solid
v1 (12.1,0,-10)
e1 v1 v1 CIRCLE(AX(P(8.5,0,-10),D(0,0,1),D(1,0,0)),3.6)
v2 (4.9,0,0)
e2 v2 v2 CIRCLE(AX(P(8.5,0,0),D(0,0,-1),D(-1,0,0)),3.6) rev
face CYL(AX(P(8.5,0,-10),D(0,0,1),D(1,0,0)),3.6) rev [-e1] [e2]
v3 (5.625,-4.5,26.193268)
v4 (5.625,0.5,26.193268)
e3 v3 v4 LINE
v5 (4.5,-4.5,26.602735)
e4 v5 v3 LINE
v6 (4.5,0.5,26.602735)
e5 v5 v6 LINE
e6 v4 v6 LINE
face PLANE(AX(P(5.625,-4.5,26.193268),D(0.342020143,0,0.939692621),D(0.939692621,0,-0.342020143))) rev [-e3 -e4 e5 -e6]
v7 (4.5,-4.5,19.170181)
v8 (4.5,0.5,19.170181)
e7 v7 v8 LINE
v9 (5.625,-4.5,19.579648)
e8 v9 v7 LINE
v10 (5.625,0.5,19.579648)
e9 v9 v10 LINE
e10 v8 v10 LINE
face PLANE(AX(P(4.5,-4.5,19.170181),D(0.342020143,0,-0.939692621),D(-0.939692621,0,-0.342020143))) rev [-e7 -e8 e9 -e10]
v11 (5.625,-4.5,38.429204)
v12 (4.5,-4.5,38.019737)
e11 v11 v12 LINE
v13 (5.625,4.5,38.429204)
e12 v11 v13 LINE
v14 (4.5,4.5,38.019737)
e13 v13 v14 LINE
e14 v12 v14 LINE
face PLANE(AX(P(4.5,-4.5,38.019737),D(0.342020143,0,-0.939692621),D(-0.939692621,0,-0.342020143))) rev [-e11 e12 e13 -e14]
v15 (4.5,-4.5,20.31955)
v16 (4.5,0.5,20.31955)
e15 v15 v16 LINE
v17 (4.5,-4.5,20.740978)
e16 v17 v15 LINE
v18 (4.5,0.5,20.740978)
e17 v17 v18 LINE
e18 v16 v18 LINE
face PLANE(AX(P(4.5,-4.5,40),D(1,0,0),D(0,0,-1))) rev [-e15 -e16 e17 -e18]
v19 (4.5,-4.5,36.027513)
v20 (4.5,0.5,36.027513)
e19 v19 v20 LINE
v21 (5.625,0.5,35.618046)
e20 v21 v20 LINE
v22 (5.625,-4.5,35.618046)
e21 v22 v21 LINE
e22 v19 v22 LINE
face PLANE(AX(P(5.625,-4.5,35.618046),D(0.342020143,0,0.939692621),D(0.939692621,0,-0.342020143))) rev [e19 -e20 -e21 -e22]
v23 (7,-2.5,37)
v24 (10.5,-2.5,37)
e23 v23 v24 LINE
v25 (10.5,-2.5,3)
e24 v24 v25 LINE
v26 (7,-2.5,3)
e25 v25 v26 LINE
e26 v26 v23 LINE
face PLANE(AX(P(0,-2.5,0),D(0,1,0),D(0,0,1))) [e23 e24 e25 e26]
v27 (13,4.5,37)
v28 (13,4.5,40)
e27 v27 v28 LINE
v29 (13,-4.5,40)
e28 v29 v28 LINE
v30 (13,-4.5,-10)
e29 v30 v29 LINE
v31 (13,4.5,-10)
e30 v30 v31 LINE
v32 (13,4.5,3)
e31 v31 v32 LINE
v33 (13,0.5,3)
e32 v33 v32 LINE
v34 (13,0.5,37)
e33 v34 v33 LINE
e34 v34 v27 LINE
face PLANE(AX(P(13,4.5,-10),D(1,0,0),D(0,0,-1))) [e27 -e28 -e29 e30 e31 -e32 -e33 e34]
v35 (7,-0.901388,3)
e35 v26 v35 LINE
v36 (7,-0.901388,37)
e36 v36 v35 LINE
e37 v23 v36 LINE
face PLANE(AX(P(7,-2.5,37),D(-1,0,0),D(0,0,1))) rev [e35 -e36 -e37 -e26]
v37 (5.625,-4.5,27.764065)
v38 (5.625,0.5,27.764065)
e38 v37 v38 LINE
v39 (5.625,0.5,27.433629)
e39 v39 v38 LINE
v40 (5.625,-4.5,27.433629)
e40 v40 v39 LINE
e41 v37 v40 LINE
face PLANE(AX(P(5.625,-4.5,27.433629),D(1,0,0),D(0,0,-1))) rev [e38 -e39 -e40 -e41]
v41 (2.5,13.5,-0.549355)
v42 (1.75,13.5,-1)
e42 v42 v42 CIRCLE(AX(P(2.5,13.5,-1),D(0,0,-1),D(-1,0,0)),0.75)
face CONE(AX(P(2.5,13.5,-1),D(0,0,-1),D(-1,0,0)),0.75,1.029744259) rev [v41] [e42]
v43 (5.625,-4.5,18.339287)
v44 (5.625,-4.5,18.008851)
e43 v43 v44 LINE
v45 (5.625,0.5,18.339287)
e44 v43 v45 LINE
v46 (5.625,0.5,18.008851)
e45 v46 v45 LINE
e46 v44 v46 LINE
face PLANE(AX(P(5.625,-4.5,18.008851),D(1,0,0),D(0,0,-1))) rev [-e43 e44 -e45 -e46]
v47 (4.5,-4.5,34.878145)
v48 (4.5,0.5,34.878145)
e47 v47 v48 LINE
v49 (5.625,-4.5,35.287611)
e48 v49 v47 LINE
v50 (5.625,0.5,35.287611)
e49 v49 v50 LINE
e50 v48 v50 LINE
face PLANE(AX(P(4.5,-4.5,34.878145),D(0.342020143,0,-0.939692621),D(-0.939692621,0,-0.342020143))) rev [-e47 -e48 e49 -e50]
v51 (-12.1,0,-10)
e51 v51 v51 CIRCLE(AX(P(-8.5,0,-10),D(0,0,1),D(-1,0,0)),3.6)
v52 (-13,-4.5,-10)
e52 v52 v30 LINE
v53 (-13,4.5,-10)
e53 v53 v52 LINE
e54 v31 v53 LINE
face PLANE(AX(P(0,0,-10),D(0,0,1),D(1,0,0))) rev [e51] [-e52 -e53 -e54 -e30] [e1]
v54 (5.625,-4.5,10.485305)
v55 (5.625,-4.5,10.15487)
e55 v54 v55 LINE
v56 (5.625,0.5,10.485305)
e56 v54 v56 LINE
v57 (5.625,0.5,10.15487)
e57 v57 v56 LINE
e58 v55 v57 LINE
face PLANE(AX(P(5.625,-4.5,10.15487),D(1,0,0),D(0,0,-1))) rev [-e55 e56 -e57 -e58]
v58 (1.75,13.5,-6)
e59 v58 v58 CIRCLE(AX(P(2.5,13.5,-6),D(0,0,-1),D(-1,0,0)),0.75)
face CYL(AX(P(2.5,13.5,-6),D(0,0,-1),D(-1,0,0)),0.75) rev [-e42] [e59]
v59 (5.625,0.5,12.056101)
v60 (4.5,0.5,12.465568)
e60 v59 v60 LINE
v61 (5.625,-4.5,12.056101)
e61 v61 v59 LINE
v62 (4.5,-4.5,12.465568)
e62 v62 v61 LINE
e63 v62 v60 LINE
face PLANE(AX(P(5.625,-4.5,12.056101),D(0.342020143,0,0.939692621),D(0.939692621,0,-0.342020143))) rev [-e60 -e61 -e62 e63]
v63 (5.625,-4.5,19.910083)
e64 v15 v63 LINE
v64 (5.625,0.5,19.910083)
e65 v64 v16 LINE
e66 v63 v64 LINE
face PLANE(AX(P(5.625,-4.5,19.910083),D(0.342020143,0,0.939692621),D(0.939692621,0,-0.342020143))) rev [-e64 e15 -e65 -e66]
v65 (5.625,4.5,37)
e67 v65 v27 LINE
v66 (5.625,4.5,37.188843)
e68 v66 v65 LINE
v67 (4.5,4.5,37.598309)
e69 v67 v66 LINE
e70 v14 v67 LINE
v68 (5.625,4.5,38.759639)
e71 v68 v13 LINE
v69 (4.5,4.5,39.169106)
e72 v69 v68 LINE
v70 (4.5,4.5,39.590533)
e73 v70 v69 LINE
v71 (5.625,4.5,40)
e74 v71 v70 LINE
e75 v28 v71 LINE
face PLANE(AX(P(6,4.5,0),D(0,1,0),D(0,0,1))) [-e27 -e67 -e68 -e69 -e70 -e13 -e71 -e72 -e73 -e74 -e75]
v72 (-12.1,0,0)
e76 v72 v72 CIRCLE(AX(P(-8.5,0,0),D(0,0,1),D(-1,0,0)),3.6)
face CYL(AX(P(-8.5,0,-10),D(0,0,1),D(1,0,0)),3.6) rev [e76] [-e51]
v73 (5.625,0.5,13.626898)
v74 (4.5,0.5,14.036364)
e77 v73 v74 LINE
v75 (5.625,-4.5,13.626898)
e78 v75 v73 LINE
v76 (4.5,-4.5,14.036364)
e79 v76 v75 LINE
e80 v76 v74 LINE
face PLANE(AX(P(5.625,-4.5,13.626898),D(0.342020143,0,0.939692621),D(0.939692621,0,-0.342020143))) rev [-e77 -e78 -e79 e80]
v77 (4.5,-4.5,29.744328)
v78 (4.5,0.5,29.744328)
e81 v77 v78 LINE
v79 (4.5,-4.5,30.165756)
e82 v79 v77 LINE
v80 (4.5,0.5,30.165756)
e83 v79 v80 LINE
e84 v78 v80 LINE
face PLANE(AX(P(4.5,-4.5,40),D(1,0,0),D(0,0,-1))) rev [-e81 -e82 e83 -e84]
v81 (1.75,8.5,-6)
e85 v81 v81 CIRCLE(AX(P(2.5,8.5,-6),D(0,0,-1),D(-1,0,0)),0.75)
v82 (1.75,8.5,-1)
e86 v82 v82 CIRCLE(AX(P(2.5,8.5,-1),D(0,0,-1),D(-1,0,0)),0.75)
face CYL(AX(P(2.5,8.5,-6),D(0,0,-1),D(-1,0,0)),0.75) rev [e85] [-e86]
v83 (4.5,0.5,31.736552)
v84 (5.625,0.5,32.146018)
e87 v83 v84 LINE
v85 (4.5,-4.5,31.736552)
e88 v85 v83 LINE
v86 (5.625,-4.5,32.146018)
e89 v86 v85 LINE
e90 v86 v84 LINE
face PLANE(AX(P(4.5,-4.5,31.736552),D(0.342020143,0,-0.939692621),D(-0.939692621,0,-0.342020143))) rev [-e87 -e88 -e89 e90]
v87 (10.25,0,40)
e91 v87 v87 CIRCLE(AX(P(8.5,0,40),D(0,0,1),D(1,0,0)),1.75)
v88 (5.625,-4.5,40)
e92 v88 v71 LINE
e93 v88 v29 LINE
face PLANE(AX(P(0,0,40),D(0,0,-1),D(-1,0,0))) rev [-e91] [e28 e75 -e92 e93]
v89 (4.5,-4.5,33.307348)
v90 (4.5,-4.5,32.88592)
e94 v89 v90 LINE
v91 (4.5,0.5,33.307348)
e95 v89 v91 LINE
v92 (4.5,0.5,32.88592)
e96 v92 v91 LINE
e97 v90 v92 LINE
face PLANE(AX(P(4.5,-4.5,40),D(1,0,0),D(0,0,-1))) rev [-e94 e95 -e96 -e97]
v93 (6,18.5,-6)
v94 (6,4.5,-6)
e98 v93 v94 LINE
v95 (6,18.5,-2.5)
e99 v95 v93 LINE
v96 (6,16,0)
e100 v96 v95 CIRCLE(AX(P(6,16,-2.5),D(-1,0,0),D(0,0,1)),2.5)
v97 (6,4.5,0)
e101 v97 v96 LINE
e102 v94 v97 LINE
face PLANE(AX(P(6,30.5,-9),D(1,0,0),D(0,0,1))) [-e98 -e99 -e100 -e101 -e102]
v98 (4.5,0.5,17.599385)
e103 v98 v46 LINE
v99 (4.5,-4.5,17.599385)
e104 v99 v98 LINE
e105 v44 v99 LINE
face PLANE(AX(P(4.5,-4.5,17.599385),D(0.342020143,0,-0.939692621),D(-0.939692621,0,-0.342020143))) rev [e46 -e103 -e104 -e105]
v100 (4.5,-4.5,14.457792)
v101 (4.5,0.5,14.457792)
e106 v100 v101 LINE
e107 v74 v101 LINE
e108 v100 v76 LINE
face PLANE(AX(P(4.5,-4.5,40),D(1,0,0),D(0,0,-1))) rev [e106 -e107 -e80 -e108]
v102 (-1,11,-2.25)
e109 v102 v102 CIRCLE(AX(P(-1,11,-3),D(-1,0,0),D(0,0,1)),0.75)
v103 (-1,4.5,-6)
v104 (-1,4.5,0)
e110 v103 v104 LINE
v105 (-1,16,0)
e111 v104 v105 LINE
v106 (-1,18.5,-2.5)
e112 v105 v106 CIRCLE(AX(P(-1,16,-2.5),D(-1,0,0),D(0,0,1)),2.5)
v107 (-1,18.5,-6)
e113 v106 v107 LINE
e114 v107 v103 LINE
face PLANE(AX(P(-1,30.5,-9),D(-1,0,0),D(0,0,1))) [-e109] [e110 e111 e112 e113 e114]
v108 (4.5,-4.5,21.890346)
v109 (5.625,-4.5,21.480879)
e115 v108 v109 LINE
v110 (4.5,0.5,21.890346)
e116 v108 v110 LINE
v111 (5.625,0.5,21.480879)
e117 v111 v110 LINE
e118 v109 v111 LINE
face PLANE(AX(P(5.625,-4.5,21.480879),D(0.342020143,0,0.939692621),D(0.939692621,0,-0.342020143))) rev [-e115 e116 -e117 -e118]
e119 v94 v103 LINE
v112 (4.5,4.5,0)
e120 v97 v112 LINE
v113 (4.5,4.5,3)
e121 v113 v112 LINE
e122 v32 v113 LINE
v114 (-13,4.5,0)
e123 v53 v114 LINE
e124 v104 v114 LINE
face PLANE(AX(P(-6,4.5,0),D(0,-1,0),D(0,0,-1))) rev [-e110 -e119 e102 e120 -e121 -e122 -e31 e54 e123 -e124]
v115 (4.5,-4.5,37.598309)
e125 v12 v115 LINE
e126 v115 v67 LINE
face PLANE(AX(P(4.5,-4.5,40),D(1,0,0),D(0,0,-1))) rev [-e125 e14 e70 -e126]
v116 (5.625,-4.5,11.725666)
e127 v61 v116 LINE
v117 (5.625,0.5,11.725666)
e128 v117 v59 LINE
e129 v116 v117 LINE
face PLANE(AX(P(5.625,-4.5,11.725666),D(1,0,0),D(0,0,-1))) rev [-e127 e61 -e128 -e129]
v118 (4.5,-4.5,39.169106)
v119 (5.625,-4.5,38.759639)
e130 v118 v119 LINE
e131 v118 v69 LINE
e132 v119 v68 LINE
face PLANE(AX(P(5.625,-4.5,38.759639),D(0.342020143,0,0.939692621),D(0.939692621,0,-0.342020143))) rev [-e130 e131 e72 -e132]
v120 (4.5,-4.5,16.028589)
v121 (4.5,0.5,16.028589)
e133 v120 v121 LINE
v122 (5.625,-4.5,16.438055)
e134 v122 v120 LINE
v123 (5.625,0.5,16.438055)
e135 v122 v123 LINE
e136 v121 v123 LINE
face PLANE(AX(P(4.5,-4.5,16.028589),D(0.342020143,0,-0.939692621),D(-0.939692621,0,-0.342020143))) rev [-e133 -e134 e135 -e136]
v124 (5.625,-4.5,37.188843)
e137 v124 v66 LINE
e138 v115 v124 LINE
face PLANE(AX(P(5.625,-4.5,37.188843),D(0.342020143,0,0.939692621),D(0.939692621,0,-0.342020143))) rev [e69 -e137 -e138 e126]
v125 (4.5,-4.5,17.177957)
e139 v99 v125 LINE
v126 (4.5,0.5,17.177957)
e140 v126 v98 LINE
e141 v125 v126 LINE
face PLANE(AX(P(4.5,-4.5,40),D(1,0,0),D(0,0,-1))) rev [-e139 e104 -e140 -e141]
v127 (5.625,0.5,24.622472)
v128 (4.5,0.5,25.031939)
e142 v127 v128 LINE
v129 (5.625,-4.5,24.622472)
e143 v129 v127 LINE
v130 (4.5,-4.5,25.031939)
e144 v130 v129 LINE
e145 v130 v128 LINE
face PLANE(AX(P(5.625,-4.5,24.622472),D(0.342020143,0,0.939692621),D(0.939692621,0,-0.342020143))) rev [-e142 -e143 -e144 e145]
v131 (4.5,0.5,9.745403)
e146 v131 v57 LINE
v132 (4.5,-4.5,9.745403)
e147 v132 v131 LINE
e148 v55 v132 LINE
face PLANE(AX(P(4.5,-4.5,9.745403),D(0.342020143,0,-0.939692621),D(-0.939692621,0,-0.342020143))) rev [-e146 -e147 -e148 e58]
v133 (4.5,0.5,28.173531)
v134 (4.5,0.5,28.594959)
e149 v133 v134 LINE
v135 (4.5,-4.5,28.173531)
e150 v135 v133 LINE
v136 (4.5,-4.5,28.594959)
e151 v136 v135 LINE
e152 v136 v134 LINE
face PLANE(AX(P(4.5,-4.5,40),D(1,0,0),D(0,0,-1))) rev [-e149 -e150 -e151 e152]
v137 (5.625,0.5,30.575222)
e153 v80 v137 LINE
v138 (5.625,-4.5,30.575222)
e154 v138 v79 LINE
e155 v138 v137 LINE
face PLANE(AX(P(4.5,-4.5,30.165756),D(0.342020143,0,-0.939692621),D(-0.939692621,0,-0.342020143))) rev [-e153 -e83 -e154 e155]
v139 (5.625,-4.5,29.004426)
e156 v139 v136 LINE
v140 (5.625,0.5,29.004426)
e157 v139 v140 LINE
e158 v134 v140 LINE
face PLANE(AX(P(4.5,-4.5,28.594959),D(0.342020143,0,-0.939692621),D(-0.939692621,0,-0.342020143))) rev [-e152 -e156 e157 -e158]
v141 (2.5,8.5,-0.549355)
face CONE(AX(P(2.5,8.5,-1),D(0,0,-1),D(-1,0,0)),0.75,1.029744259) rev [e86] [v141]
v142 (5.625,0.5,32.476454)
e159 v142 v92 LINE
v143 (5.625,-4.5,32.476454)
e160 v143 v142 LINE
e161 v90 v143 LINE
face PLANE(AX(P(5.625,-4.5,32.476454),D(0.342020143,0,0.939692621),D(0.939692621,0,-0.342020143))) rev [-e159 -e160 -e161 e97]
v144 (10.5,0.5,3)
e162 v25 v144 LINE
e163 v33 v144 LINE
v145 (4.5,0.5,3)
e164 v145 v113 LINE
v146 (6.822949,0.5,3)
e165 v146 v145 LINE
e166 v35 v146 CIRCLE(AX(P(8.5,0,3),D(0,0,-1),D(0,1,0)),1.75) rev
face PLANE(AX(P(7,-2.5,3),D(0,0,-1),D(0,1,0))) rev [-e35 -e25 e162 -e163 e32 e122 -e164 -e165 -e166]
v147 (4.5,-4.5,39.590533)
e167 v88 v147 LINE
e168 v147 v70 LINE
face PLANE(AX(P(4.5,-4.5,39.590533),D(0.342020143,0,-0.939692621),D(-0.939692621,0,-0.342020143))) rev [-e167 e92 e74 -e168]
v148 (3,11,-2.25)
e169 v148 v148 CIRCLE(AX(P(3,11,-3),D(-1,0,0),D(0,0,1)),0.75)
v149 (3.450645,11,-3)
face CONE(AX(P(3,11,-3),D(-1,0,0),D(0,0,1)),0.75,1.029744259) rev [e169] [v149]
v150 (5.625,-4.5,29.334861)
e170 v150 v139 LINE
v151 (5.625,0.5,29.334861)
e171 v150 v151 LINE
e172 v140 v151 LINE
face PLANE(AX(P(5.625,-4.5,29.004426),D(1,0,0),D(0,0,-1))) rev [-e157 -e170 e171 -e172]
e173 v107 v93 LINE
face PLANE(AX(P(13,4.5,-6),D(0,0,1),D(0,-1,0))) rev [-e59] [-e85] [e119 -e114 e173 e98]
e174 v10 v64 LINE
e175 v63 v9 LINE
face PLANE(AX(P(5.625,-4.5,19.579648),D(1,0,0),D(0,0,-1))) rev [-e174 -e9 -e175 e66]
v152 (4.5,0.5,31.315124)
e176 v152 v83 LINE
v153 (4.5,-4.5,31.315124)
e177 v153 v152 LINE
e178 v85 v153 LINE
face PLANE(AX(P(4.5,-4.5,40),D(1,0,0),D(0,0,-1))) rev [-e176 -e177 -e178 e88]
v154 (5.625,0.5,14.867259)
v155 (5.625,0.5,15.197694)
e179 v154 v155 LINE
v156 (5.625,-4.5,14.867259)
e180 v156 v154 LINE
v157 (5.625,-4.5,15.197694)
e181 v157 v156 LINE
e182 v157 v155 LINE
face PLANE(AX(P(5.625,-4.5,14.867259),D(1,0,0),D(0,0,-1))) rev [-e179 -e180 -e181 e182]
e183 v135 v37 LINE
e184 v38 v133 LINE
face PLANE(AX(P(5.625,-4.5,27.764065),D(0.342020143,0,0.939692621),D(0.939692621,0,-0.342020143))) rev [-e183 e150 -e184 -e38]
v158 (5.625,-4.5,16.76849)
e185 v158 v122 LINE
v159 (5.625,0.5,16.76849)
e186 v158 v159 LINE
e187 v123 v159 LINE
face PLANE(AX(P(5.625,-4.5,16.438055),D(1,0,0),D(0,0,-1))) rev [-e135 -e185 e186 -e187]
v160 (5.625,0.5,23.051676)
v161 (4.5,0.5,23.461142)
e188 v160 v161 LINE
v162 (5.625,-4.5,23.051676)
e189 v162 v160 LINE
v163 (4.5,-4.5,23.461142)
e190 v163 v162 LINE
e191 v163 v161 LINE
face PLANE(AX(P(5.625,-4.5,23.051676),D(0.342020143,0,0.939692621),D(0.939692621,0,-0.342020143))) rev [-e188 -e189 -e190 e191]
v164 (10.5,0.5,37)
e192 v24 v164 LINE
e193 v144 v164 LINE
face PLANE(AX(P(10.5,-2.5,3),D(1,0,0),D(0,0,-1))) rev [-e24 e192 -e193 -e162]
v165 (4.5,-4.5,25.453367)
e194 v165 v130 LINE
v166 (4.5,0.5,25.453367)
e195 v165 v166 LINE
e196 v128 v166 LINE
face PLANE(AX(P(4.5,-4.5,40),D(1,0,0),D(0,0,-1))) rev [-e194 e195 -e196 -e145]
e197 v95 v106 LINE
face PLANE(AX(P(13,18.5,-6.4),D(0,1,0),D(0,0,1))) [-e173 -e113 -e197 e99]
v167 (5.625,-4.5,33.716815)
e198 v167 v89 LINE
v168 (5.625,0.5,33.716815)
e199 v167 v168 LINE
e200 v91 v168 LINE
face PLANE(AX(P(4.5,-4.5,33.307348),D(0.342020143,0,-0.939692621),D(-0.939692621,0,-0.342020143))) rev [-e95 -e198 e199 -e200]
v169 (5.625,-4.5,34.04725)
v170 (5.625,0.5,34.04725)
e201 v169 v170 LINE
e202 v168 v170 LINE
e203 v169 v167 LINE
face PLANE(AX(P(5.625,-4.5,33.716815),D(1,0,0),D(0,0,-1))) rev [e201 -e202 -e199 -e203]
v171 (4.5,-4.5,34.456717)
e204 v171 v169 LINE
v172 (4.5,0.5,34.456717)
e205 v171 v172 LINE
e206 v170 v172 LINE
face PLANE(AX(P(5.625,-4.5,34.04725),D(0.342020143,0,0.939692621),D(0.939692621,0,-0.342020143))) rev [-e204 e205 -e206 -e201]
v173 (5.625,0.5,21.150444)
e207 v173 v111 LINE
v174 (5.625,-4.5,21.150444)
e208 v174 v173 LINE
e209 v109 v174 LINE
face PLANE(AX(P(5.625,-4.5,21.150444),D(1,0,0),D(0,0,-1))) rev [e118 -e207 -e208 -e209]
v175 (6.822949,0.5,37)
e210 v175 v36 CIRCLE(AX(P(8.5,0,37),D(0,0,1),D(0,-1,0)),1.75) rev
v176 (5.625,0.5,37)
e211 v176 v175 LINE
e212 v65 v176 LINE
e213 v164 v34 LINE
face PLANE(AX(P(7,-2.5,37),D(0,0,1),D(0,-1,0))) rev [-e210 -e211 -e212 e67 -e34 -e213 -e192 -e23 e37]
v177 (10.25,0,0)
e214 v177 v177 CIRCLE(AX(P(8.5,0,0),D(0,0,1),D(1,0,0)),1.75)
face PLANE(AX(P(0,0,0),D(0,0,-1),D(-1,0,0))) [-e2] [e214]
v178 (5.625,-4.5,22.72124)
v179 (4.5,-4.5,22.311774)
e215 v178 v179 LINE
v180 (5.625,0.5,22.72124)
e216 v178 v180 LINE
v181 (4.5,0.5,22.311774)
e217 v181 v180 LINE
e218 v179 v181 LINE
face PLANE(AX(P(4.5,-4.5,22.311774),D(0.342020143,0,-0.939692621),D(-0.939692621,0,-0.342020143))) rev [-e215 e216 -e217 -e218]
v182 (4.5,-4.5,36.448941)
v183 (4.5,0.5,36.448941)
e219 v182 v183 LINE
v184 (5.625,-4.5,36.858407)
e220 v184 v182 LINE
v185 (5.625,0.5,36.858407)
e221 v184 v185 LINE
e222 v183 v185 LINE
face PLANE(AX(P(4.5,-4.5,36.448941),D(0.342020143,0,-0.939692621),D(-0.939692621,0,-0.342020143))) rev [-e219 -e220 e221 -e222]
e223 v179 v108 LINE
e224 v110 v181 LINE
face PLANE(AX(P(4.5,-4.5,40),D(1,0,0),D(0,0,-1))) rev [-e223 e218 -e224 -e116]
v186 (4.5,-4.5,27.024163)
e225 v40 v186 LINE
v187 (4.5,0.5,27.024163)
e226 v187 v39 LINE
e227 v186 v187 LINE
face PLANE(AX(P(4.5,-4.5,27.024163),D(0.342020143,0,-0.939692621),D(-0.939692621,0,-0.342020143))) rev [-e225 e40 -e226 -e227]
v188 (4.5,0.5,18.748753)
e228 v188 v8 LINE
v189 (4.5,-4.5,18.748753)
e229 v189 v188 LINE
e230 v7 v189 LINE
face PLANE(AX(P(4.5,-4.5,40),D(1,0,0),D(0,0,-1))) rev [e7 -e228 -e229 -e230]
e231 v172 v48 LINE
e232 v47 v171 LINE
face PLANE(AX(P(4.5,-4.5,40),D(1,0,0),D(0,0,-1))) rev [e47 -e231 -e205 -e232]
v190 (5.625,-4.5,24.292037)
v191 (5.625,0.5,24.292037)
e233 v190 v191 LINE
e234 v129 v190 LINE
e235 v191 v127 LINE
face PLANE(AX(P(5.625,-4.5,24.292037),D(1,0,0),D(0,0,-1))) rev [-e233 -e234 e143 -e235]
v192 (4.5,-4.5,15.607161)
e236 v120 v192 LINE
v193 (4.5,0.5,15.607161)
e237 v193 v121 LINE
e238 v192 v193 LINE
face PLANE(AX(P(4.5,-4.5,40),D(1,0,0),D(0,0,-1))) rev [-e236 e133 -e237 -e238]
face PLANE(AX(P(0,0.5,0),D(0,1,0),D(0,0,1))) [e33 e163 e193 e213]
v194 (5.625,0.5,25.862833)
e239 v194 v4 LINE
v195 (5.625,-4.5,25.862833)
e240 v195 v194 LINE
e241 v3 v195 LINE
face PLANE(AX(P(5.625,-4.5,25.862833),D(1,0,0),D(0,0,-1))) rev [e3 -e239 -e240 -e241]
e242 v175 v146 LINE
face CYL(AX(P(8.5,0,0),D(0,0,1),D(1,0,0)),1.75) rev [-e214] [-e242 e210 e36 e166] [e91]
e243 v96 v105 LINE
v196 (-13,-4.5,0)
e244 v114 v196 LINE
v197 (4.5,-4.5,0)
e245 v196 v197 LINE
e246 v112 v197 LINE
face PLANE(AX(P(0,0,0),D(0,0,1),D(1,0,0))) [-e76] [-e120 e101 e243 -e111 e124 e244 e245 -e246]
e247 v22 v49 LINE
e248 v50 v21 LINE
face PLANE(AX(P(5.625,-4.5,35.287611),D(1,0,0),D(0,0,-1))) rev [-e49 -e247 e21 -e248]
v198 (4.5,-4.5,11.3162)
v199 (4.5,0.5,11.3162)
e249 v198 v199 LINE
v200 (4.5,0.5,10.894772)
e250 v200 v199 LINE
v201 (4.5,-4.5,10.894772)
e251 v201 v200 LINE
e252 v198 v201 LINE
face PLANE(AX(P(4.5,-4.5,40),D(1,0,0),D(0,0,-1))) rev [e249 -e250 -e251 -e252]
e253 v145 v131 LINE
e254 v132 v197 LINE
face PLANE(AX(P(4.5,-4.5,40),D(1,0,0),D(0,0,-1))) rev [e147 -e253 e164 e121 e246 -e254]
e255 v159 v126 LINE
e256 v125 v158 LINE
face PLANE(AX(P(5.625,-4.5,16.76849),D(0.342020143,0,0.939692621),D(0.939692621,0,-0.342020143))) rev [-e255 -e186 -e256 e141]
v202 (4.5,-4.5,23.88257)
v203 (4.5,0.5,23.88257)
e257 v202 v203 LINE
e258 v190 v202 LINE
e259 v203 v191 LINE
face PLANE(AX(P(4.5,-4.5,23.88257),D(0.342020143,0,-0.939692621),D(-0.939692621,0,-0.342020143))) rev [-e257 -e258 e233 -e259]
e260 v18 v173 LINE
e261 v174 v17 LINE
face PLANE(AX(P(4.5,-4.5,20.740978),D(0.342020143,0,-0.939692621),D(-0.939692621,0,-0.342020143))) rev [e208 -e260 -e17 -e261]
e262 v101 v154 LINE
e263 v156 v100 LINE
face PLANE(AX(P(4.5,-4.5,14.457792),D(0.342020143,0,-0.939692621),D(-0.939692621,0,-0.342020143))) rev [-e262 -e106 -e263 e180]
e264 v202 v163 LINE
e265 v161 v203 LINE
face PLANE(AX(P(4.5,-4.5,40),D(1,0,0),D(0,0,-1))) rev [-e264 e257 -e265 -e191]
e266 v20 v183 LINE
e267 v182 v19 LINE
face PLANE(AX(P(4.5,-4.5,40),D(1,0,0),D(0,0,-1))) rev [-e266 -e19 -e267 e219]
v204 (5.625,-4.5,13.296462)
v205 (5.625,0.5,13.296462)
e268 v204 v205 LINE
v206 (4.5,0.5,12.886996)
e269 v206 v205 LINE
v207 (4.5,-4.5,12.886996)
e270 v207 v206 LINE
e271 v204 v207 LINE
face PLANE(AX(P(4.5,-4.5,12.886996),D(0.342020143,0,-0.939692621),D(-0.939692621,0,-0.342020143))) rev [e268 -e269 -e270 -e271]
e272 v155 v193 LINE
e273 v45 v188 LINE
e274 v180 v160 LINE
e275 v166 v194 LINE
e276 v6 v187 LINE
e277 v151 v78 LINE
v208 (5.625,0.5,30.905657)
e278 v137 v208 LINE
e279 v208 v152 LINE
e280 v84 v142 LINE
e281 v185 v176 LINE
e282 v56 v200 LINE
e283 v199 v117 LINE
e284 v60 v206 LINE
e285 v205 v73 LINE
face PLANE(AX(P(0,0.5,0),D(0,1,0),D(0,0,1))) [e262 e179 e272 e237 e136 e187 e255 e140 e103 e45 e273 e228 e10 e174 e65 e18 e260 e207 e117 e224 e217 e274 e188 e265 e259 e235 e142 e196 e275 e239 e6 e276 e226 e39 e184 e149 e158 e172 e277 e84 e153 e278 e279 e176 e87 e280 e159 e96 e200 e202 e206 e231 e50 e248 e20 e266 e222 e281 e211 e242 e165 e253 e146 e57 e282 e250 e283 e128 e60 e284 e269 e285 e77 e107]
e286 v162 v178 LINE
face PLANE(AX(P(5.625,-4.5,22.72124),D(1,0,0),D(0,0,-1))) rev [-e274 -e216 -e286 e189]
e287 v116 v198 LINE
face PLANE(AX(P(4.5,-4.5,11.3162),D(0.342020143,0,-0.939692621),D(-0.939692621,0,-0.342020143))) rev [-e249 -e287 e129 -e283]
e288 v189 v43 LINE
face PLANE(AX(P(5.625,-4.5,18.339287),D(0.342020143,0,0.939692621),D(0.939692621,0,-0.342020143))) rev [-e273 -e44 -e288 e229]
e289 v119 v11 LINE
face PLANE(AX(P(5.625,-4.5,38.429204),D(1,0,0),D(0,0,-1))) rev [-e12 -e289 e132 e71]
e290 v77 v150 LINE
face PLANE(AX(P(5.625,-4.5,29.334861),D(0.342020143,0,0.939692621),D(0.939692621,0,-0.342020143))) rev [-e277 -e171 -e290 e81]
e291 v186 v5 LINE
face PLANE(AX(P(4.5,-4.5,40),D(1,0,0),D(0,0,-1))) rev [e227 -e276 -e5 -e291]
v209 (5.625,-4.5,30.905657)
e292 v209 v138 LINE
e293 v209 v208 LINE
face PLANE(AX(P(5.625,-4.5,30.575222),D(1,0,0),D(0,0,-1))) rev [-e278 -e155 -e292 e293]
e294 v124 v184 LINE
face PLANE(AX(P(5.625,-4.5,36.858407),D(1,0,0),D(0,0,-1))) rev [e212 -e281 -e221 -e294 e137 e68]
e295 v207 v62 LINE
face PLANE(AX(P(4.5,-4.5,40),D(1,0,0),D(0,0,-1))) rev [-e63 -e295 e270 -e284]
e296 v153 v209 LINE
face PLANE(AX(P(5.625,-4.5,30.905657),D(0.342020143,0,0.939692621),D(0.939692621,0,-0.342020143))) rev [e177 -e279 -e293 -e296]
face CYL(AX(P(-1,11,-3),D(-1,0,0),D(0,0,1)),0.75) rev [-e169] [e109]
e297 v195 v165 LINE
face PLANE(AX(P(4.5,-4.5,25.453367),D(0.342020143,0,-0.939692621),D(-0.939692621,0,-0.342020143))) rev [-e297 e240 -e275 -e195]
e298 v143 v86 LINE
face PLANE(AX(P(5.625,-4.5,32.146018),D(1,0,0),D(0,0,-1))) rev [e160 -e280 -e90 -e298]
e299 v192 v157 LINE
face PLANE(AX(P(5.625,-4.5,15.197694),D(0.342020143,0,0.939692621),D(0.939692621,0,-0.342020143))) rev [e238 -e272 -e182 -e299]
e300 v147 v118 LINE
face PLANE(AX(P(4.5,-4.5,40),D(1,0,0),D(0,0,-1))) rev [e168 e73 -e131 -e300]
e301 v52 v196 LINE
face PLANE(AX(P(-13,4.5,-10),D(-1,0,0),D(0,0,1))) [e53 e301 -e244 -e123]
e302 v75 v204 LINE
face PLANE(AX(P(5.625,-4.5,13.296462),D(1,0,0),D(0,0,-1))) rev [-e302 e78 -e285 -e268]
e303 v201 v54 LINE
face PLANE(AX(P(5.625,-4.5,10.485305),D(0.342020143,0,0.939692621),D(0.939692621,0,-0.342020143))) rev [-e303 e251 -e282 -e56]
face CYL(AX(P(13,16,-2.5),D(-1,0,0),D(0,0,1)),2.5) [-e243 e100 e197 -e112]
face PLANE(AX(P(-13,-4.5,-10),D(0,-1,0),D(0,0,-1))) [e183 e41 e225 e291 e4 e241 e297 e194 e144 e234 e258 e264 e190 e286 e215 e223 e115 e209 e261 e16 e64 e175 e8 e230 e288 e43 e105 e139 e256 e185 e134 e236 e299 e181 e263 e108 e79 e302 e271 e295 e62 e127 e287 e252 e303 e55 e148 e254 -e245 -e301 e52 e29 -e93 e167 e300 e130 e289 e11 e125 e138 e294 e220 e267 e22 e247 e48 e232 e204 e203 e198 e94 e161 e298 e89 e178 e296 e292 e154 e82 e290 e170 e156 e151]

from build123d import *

# Parameters (mm, degrees)
SKETCH_1_W                = 26
SKETCH_1_H                = 9
EXTRUDE_1_DEPTH           = 10
SKETCH_2_R                = 3.6
CUT_EXTRUDE_1_DEPTH       = 18.007351352
EXTRUDE_2_DEPTH           = 26
CUT_EXTRUDE_2_DEPTH       = 7
SKETCH_7_W                = 8.5
SKETCH_7_H                = 9
EXTRUDE_3_DEPTH           = 40
SKETCH_8_R                = 1.75
CUT_EXTRUDE_3_DEPTH       = 40
SKETCH_9_W                = 3.5
SKETCH_9_H                = 34
CUT_EXTRUDE_4_DEPTH       = 7
CUT_EXTRUDE_12_DEPTH      = 50.979995998
PATTERN_START             = -4.5
PATTERN_LINEAR_2_DEPTH    = 9
SKETCH_22_W               = 8.5
SKETCH_22_H               = 34
CUT_EXTRUDE_13_DEPTH      = 4
CUT_EXTRUDE_17_DEPTH      = 58.168610268
CUT_EXTRUDE_17_DEPTH_BACK = 58.168610268
SKETCH_27_W               = 4
SKETCH_27_H               = 28.3452151
CUT_EXTRUDE_18_DEPTH      = 52.168838173
CUT_EXTRUDE_18_DEPTH_BACK = 12
F_2_0MM_1_D               = 1.5
F_2_0MM_1_DEPTH           = 5
F_2_0MM_1_TIP             = 0.450645464
F_2_0MM_2_D               = 1.5
F_2_0MM_2_DEPTH           = 4
F_2_0MM_2_TIP             = 0.450645464


# Read off the part's stored shape, not the designer's step: 阵列(线性)2
with BuildPart() as part:
    # 草图1 → 凸台-拉伸1 (new body)
    with BuildSketch(Plane.XY):
        Rectangle(SKETCH_1_W, SKETCH_1_H)
    extrude(amount=-EXTRUDE_1_DEPTH)

    # 草图2 → 切除-拉伸1 (cut, through all)
    with BuildSketch(Plane.XY):
        with Locations((8.5, 0)):
            Circle(SKETCH_2_R)
        with Locations(Location((-8.5, 0, 0), (0, 0, 180))):
            Circle(SKETCH_2_R)
    extrude(amount=-CUT_EXTRUDE_1_DEPTH, mode=Mode.SUBTRACT)

    # 草图5 → 凸台-拉伸2 (add, through all)
    with BuildSketch(Plane.ZY.offset(13)):
        with BuildLine():
            Line((0, 4.5), (-10, 4.5))
            Line((-10, 4.5), (-10, 8.301419967))
            Line((-10, 8.301419967), (-10, 30.5))
            ThreePointArc((-10, 30.5), (-9.707106781, 31.207106781), (-9, 31.5))
            Line((-9, 31.5), (-8, 31.5))
            Line((-8, 31.5), (-8, 20.1))
            ThreePointArc((-8, 20.1), (-7.53137085, 18.96862915), (-6.4, 18.5))
            Line((-6.4, 18.5), (-2.5, 18.5))
            ThreePointArc((-2.5, 18.5), (-0.732233047, 17.767766953), (0, 16))
            Line((0, 16), (0, 4.5))
        make_face()
    extrude(amount=-EXTRUDE_2_DEPTH)

    # 草图5<2> → 切除-拉伸2 (cut)
    with BuildSketch(Plane.ZY.offset(13)):
        with BuildLine():
            Line((0, 4.5), (-10, 4.5))
            Line((-10, 4.5), (-10, 8.301419967))
            Line((-10, 8.301419967), (-10, 30.5))
            ThreePointArc((-10, 30.5), (-9.707106781, 31.207106781), (-9, 31.5))
            Line((-9, 31.5), (-8, 31.5))
            Line((-8, 31.5), (-8, 20.1))
            ThreePointArc((-8, 20.1), (-7.53137085, 18.96862915), (-6.4, 18.5))
            Line((-6.4, 18.5), (-2.5, 18.5))
            ThreePointArc((-2.5, 18.5), (-0.732233047, 17.767766953), (0, 16))
            Line((0, 16), (0, 4.5))
        make_face()
    cut_extrude_2 = extrude(amount=-CUT_EXTRUDE_2_DEPTH, mode=Mode.SUBTRACT)

    # 镜向1: 切除-拉伸2 across plane
    add(cut_extrude_2.mirror(Plane(origin=(0, 0, 0), x_dir=(0, 0, 1), z_dir=(1, 0, 0))), mode=Mode.SUBTRACT)

    # 草图7 → 凸台-拉伸3 (add)
    with BuildSketch(Plane.XY):
        with Locations((8.75, 0)):
            Rectangle(SKETCH_7_W, SKETCH_7_H)
    extrude(amount=EXTRUDE_3_DEPTH)

    # 草图8 → 切除-拉伸3 (cut)
    with BuildSketch(Plane.XY.offset(40)):
        with Locations((8.5, 0)):
            Circle(SKETCH_8_R)
    extrude(amount=-CUT_EXTRUDE_3_DEPTH, mode=Mode.SUBTRACT)

    # 草图9 → 切除-拉伸4 (cut)
    with BuildSketch(Plane(origin=(0, 4.5, 0), x_dir=(1, 0, 0), z_dir=(0, 1, 0))):
        with Locations((8.75, -20)):
            Rectangle(SKETCH_9_W, SKETCH_9_H)
    extrude(amount=-CUT_EXTRUDE_4_DEPTH, mode=Mode.SUBTRACT)

    # 草图10 → 切除-拉伸12 (cut, through all)
    with BuildSketch(Plane(origin=(0, 4.5, 0), x_dir=(1, 0, 0), z_dir=(0, 1, 0))):
        Polygon((5.625, -40), (5.625, -40.330435371), (4.5, -40.739901884), (4.5, -39.590533486), align=None)
    extrude(amount=-CUT_EXTRUDE_12_DEPTH, mode=Mode.SUBTRACT)

    # 阵列(线性)2 outline → 阵列(线性)2 (cut)
    with BuildSketch(Plane(origin=(0, 0, 0), x_dir=(1, 0, 0), z_dir=(0, 1, 0)).offset(PATTERN_START)):
        Polygon((5.625, -10.485305161), (5.625, -10.154869791), (4.5, -9.745403277), (4.5, -10.894771675), align=None)
        Polygon((5.625, -38.429203673), (4.5, -38.01973716), (4.5, -39.169105557), (5.625, -38.759639044), align=None)
        Polygon((5.625, -36.858407346), (4.5, -36.448940833), (4.5, -37.598309231), (5.625, -37.188842717), align=None)
        Polygon((5.625, -35.28761102), (4.5, -34.878144506), (4.5, -36.027512904), (5.625, -35.61804639), align=None)
        Polygon((5.625, -33.716814693), (4.5, -33.307348179), (4.5, -34.456716577), (5.625, -34.047250063), align=None)
        Polygon((5.625, -32.146018366), (4.5, -31.736551852), (4.5, -32.88592025), (5.625, -32.476453737), align=None)
        Polygon((5.625, -30.575222039), (4.5, -30.165755526), (4.5, -31.315123923), (5.625, -30.90565741), align=None)
        Polygon((5.625, -29.004425712), (4.5, -28.594959199), (4.5, -29.744327597), (5.625, -29.334861083), align=None)
        Polygon((5.625, -27.433629386), (4.5, -27.024162872), (4.5, -28.17353127), (5.625, -27.764064756), align=None)
        Polygon((5.625, -25.862833059), (4.5, -25.453366545), (4.5, -26.602734943), (5.625, -26.193268429), align=None)
        Polygon((5.625, -24.292036732), (4.5, -23.882570219), (4.5, -25.031938616), (5.625, -24.622472103), align=None)
        Polygon((5.625, -22.721240405), (4.5, -22.311773892), (4.5, -23.461142289), (5.625, -23.051675776), align=None)
        Polygon((5.625, -21.150444078), (4.5, -20.740977565), (4.5, -21.890345963), (5.625, -21.480879449), align=None)
        Polygon((5.625, -19.579647752), (4.5, -19.170181238), (4.5, -20.319549636), (5.625, -19.910083122), align=None)
        Polygon((5.625, -18.008851425), (4.5, -17.599384911), (4.5, -18.748753309), (5.625, -18.339286795), align=None)
        Polygon((5.625, -16.438055098), (4.5, -16.028588585), (4.5, -17.177956982), (5.625, -16.768490469), align=None)
        Polygon((5.625, -14.867258771), (4.5, -14.457792258), (4.5, -15.607160655), (5.625, -15.197694142), align=None)
        Polygon((5.625, -13.296462444), (4.5, -12.886995931), (4.5, -14.036364329), (5.625, -13.626897815), align=None)
        Polygon((5.625, -11.725666118), (4.5, -11.316199604), (4.5, -12.465568002), (5.625, -12.056101488), align=None)
    extrude(amount=PATTERN_LINEAR_2_DEPTH, mode=Mode.SUBTRACT)

    # 草图22 → 切除-拉伸13 (cut)
    with BuildSketch(Plane(origin=(0, 4.5, 0), x_dir=(1, 0, 0), z_dir=(0, 1, 0))):
        with Locations((8.75, -20)):
            Rectangle(SKETCH_22_W, SKETCH_22_H)
    extrude(amount=-CUT_EXTRUDE_13_DEPTH, mode=Mode.SUBTRACT)

    # 草图27 → 切除-拉伸17 (cut, two sides: drawn at the far end of the back side and taken through both)
    with BuildSketch(Plane.ZY.offset(13).offset(-CUT_EXTRUDE_17_DEPTH_BACK)):
        with Locations((-8, 18.67260755)):
            Rectangle(SKETCH_27_W, SKETCH_27_H)
    extrude(amount=CUT_EXTRUDE_17_DEPTH + CUT_EXTRUDE_17_DEPTH_BACK, mode=Mode.SUBTRACT)

    # 草图5<5> → 切除-拉伸18 (cut, two sides: drawn at the far end of the back side and taken through both)
    with BuildSketch(Plane.ZY.offset(13).offset(-CUT_EXTRUDE_18_DEPTH_BACK)):
        with BuildLine():
            Line((0, 4.5), (-10, 4.5))
            Line((-10, 4.5), (-10, 8.301419967))
            Line((-10, 8.301419967), (-10, 30.5))
            ThreePointArc((-10, 30.5), (-9.707106781, 31.207106781), (-9, 31.5))
            Line((-9, 31.5), (-8, 31.5))
            Line((-8, 31.5), (-8, 20.1))
            ThreePointArc((-8, 20.1), (-7.53137085, 18.96862915), (-6.4, 18.5))
            Line((-6.4, 18.5), (-2.5, 18.5))
            ThreePointArc((-2.5, 18.5), (-0.732233047, 17.767766953), (0, 16))
            Line((0, 16), (0, 4.5))
        make_face()
    extrude(amount=CUT_EXTRUDE_18_DEPTH + CUT_EXTRUDE_18_DEPTH_BACK, mode=Mode.SUBTRACT)

    # Ø2.0mm 暗销孔1
    with Locations(Plane(origin=(0, 0, -6), x_dir=(-1, 0, 0), z_dir=(0, 0, -1))):
        with Locations((-2.5, 13.5), (-2.5, 8.5)):
            Hole(F_2_0MM_1_D / 2, depth=F_2_0MM_1_DEPTH)
            with Locations((0, 0, -(F_2_0MM_1_DEPTH + F_2_0MM_1_TIP / 2))):  # 118° drill point
                Cone(0, F_2_0MM_1_D / 2, F_2_0MM_1_TIP, mode=Mode.SUBTRACT)

    # Ø2.0mm 暗销孔2
    with Locations(Plane.ZY.offset(1)):
        with Locations((-3, 11)):
            Hole(F_2_0MM_2_D / 2, depth=F_2_0MM_2_DEPTH)
            with Locations((0, 0, -(F_2_0MM_2_DEPTH + F_2_0MM_2_TIP / 2))):  # 118° drill point
                Cone(0, F_2_0MM_2_D / 2, F_2_0MM_2_TIP, mode=Mode.SUBTRACT)


solid = part.part
